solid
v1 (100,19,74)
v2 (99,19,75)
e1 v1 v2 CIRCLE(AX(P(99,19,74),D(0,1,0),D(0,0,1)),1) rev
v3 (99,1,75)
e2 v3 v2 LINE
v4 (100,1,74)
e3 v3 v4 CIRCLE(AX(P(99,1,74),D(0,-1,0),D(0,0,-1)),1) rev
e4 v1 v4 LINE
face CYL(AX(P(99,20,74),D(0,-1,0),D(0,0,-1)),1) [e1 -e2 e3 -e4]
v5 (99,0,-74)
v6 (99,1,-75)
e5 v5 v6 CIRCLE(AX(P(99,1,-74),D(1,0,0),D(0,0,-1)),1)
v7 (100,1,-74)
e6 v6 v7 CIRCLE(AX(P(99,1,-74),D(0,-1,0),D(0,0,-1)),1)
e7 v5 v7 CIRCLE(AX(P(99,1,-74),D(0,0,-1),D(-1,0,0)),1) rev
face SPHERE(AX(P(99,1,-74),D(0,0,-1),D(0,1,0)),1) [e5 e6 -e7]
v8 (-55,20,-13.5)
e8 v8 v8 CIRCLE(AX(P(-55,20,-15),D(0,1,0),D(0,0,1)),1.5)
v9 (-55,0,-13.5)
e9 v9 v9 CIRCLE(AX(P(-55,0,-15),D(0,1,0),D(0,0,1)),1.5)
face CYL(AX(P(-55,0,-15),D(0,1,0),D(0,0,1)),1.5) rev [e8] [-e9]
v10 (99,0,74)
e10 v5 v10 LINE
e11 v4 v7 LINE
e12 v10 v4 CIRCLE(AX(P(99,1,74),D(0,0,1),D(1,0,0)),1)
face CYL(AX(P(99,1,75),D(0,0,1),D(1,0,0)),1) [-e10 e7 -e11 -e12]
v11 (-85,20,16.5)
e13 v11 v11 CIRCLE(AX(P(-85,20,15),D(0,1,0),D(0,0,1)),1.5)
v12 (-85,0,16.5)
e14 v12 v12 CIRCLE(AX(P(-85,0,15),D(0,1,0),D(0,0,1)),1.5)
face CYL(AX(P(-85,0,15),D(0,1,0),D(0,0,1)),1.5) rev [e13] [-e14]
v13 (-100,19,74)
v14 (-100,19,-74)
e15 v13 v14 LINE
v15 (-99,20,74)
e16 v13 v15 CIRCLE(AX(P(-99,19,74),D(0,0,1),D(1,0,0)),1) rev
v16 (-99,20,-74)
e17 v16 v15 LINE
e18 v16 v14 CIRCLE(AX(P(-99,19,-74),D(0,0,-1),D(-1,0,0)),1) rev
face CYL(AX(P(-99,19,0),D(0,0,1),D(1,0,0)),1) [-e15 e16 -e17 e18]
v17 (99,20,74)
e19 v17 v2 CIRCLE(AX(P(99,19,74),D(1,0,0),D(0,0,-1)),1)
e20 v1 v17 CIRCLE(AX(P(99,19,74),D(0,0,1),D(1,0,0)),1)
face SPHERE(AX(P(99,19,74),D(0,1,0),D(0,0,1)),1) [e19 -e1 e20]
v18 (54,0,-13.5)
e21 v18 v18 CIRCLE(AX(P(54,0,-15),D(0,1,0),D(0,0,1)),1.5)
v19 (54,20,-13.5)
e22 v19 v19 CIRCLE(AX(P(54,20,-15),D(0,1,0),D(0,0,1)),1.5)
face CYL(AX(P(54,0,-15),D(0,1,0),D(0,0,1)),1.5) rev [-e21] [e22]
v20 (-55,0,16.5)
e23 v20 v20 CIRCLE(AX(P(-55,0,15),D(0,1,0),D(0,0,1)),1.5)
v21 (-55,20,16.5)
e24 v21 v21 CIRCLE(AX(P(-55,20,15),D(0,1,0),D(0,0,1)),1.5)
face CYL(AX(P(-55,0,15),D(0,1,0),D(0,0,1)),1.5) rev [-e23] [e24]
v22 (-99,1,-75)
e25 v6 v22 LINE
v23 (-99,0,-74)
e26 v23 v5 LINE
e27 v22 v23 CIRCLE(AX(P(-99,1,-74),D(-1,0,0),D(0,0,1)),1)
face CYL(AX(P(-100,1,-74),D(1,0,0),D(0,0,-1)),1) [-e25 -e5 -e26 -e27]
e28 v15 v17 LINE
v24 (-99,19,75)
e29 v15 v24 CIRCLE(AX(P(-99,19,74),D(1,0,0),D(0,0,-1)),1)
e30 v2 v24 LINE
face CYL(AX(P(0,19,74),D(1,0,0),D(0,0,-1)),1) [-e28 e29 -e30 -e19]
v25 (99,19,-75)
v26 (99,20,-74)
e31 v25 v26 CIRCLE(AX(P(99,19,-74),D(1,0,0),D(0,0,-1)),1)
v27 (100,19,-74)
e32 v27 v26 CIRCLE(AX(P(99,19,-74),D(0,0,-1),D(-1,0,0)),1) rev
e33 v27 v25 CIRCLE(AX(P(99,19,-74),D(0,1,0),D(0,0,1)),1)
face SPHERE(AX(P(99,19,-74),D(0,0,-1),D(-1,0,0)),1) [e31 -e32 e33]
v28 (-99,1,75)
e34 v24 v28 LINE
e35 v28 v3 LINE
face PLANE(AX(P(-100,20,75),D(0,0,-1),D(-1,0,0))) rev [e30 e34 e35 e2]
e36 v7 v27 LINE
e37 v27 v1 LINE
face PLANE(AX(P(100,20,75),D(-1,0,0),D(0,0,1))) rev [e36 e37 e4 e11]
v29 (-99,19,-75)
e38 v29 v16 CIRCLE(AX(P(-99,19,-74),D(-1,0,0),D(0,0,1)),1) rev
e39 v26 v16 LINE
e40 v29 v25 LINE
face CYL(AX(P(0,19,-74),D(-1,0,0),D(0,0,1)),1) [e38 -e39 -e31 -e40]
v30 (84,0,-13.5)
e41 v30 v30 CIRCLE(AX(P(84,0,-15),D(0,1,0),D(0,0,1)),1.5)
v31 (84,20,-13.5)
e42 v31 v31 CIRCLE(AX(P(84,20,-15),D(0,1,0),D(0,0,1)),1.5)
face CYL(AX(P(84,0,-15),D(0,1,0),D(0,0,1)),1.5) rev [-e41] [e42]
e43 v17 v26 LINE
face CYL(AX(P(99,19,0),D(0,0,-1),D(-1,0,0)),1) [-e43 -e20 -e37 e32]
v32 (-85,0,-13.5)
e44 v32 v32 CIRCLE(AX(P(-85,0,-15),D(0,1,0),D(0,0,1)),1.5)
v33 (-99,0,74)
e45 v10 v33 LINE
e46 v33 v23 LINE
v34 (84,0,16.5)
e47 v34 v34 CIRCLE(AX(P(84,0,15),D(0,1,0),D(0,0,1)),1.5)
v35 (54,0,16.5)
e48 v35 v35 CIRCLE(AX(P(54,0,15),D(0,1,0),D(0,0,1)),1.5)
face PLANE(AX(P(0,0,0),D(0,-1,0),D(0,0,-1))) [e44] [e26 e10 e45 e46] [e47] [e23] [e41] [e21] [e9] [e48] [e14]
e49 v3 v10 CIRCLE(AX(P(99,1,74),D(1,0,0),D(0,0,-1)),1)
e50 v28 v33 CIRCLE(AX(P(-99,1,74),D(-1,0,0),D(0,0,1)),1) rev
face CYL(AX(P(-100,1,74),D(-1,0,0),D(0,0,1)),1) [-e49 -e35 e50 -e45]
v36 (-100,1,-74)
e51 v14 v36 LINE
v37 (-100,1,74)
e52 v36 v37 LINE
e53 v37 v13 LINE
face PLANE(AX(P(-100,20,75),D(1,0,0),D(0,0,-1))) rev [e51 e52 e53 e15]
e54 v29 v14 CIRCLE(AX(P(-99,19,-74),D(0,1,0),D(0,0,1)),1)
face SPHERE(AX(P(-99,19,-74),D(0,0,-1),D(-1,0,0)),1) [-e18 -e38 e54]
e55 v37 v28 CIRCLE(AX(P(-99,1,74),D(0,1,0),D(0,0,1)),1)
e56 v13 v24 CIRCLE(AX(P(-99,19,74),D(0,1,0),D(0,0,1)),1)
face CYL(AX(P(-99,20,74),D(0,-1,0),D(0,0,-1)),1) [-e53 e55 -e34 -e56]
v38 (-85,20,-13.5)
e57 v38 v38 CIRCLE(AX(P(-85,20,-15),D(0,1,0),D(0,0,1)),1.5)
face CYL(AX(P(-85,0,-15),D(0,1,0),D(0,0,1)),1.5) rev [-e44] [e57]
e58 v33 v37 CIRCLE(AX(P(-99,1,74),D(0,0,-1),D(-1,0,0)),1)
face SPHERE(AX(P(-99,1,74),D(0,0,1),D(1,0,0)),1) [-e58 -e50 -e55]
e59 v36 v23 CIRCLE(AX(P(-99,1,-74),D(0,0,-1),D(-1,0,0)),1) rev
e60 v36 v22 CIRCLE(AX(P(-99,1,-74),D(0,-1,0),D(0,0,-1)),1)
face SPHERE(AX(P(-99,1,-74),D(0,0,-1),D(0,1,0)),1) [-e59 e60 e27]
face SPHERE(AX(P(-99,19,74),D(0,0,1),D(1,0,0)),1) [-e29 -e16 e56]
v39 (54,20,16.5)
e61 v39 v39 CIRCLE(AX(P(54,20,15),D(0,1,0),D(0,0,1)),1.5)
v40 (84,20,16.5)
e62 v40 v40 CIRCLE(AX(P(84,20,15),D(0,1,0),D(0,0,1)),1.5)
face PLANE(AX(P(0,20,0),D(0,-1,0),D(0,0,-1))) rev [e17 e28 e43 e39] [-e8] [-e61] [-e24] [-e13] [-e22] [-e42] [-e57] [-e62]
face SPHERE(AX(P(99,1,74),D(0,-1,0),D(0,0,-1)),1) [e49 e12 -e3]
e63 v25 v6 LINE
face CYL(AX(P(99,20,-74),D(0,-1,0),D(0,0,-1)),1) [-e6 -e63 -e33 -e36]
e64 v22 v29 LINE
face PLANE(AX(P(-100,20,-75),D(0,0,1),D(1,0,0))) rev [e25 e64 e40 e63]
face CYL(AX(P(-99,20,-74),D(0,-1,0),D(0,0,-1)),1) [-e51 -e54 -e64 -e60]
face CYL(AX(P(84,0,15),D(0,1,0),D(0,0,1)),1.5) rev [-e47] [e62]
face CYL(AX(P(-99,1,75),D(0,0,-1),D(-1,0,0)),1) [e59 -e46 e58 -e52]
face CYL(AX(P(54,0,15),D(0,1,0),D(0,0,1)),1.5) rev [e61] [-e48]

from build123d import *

# Parameters (mm, degrees)
SKETCH2_W           = 200
SKETCH2_H           = 150
BOSS_EXTRUDE1_DEPTH = 20
FILLET1_R           = 1
FILLET2_R           = 1
SKETCH3_R           = 1.5
CUT_EXTRUDE1_DEPTH  = 20
SKETCH4_R           = 1.5
CUT_EXTRUDE2_DEPTH  = 20


with BuildPart() as part:
    # Sketch2 → Boss-Extrude1 (new body)
    with BuildSketch(Plane(origin=(0, 0, 0), x_dir=(1, 0, 0), z_dir=(0, 1, 0))):
        Rectangle(SKETCH2_W, SKETCH2_H)
    extrude(amount=BOSS_EXTRUDE1_DEPTH)

    # Fillet1
    fillet1_edges = [part.edges().sort_by_distance(p)[0] for p in [
        (-100, 20, 0),
        (0, 20, 75),
        (100, 20, 0),
        (0, 0, 75),
        (-100, 0, 0),
        (0, 0, -75),
        (100, 0, 0),
        (100, 10, 75),
        (-100, 10, -75),
        (100, 10, -75),
        (0, 20, -75),
    ]]
    fillet(fillet1_edges, radius=FILLET1_R)

    # Fillet2
    # the kernel refuses this fillet: 1 mm, written as the material it takes off along each edge
    with BuildSketch(Plane(origin=(-99, 19, 74), x_dir=(-1, 0, 0), z_dir=(0, 0, 1))) as fillet2_piece_1_section:
        Polygon((0, 0), (FILLET2_R, 0), (FILLET2_R, -FILLET2_R), (0, -FILLET2_R), align=None)
    fillet2_piece_1 = extrude(amount=FILLET2_R, mode=Mode.PRIVATE)
    fillet2_piece_1 = fillet2_piece_1 - Plane(origin=(-99, 19, 74), x_dir=(0.7071067811865475, -0.7071067811865475, 0), z_dir=(0, 0, 1)) * Sphere(FILLET2_R, mode=Mode.PRIVATE)
    add(fillet2_piece_1, mode=Mode.SUBTRACT)
    with BuildSketch(Plane(origin=(-99, 1, 74), x_dir=(-1, 0, 0), z_dir=(0, 0, 1))) as fillet2_piece_2_section:
        Polygon((0, 0), (FILLET2_R, 0), (FILLET2_R, FILLET2_R), (0, FILLET2_R), align=None)
    fillet2_piece_2 = extrude(amount=FILLET2_R, mode=Mode.PRIVATE)
    fillet2_piece_2 = fillet2_piece_2 - Plane(origin=(-99, 1, 74), x_dir=(0.7071067811865475, 0.7071067811865475, 0), z_dir=(0, 0, 1)) * Sphere(FILLET2_R, mode=Mode.PRIVATE)
    add(fillet2_piece_2, mode=Mode.SUBTRACT)
    with BuildSketch(Plane(origin=(-100, 1, 75), x_dir=(1, 0, 0), z_dir=(0, 1, 0))) as fillet2_piece_3:
        with BuildLine():
            CenterArc((FILLET2_R, FILLET2_R), FILLET2_R, 180, 90)
            Line((0, FILLET2_R), (0, 0))
            Line((0, 0), (FILLET2_R, 0))
        make_face()
    extrude(amount=18, mode=Mode.SUBTRACT)

    # Sketch3 → Cut-Extrude1 (cut)
    with BuildSketch(Plane(origin=(0, 20, 0), x_dir=(1, 0, 0), z_dir=(0, 1, 0))):
        with Locations(Location((84, 15, 0), (0, 0, 270))):
            Circle(SKETCH3_R)
        with Locations(Location((54, 15, 0), (0, 0, 270))):
            Circle(SKETCH3_R)
        with Locations(Location((54, -15, 0), (0, 0, 270))):
            Circle(SKETCH3_R)
        with Locations(Location((84, -15, 0), (0, 0, 270))):
            Circle(SKETCH3_R)
    extrude(amount=-CUT_EXTRUDE1_DEPTH, mode=Mode.SUBTRACT)

    # Sketch4 → Cut-Extrude2 (cut)
    with BuildSketch(Plane(origin=(0, 20, 0), x_dir=(1, 0, 0), z_dir=(0, 1, 0))):
        with Locations(Location((-85, 15, 0), (0, 0, 270))):
            Circle(SKETCH4_R)
        with Locations(Location((-55, 15, 0), (0, 0, 270))):
            Circle(SKETCH4_R)
        with Locations(Location((-85, -15, 0), (0, 0, 270))):
            Circle(SKETCH4_R)
        with Locations(Location((-55, -15, 0), (0, 0, 270))):
            Circle(SKETCH4_R)
    extrude(amount=-CUT_EXTRUDE2_DEPTH, mode=Mode.SUBTRACT)


solid = part.part
